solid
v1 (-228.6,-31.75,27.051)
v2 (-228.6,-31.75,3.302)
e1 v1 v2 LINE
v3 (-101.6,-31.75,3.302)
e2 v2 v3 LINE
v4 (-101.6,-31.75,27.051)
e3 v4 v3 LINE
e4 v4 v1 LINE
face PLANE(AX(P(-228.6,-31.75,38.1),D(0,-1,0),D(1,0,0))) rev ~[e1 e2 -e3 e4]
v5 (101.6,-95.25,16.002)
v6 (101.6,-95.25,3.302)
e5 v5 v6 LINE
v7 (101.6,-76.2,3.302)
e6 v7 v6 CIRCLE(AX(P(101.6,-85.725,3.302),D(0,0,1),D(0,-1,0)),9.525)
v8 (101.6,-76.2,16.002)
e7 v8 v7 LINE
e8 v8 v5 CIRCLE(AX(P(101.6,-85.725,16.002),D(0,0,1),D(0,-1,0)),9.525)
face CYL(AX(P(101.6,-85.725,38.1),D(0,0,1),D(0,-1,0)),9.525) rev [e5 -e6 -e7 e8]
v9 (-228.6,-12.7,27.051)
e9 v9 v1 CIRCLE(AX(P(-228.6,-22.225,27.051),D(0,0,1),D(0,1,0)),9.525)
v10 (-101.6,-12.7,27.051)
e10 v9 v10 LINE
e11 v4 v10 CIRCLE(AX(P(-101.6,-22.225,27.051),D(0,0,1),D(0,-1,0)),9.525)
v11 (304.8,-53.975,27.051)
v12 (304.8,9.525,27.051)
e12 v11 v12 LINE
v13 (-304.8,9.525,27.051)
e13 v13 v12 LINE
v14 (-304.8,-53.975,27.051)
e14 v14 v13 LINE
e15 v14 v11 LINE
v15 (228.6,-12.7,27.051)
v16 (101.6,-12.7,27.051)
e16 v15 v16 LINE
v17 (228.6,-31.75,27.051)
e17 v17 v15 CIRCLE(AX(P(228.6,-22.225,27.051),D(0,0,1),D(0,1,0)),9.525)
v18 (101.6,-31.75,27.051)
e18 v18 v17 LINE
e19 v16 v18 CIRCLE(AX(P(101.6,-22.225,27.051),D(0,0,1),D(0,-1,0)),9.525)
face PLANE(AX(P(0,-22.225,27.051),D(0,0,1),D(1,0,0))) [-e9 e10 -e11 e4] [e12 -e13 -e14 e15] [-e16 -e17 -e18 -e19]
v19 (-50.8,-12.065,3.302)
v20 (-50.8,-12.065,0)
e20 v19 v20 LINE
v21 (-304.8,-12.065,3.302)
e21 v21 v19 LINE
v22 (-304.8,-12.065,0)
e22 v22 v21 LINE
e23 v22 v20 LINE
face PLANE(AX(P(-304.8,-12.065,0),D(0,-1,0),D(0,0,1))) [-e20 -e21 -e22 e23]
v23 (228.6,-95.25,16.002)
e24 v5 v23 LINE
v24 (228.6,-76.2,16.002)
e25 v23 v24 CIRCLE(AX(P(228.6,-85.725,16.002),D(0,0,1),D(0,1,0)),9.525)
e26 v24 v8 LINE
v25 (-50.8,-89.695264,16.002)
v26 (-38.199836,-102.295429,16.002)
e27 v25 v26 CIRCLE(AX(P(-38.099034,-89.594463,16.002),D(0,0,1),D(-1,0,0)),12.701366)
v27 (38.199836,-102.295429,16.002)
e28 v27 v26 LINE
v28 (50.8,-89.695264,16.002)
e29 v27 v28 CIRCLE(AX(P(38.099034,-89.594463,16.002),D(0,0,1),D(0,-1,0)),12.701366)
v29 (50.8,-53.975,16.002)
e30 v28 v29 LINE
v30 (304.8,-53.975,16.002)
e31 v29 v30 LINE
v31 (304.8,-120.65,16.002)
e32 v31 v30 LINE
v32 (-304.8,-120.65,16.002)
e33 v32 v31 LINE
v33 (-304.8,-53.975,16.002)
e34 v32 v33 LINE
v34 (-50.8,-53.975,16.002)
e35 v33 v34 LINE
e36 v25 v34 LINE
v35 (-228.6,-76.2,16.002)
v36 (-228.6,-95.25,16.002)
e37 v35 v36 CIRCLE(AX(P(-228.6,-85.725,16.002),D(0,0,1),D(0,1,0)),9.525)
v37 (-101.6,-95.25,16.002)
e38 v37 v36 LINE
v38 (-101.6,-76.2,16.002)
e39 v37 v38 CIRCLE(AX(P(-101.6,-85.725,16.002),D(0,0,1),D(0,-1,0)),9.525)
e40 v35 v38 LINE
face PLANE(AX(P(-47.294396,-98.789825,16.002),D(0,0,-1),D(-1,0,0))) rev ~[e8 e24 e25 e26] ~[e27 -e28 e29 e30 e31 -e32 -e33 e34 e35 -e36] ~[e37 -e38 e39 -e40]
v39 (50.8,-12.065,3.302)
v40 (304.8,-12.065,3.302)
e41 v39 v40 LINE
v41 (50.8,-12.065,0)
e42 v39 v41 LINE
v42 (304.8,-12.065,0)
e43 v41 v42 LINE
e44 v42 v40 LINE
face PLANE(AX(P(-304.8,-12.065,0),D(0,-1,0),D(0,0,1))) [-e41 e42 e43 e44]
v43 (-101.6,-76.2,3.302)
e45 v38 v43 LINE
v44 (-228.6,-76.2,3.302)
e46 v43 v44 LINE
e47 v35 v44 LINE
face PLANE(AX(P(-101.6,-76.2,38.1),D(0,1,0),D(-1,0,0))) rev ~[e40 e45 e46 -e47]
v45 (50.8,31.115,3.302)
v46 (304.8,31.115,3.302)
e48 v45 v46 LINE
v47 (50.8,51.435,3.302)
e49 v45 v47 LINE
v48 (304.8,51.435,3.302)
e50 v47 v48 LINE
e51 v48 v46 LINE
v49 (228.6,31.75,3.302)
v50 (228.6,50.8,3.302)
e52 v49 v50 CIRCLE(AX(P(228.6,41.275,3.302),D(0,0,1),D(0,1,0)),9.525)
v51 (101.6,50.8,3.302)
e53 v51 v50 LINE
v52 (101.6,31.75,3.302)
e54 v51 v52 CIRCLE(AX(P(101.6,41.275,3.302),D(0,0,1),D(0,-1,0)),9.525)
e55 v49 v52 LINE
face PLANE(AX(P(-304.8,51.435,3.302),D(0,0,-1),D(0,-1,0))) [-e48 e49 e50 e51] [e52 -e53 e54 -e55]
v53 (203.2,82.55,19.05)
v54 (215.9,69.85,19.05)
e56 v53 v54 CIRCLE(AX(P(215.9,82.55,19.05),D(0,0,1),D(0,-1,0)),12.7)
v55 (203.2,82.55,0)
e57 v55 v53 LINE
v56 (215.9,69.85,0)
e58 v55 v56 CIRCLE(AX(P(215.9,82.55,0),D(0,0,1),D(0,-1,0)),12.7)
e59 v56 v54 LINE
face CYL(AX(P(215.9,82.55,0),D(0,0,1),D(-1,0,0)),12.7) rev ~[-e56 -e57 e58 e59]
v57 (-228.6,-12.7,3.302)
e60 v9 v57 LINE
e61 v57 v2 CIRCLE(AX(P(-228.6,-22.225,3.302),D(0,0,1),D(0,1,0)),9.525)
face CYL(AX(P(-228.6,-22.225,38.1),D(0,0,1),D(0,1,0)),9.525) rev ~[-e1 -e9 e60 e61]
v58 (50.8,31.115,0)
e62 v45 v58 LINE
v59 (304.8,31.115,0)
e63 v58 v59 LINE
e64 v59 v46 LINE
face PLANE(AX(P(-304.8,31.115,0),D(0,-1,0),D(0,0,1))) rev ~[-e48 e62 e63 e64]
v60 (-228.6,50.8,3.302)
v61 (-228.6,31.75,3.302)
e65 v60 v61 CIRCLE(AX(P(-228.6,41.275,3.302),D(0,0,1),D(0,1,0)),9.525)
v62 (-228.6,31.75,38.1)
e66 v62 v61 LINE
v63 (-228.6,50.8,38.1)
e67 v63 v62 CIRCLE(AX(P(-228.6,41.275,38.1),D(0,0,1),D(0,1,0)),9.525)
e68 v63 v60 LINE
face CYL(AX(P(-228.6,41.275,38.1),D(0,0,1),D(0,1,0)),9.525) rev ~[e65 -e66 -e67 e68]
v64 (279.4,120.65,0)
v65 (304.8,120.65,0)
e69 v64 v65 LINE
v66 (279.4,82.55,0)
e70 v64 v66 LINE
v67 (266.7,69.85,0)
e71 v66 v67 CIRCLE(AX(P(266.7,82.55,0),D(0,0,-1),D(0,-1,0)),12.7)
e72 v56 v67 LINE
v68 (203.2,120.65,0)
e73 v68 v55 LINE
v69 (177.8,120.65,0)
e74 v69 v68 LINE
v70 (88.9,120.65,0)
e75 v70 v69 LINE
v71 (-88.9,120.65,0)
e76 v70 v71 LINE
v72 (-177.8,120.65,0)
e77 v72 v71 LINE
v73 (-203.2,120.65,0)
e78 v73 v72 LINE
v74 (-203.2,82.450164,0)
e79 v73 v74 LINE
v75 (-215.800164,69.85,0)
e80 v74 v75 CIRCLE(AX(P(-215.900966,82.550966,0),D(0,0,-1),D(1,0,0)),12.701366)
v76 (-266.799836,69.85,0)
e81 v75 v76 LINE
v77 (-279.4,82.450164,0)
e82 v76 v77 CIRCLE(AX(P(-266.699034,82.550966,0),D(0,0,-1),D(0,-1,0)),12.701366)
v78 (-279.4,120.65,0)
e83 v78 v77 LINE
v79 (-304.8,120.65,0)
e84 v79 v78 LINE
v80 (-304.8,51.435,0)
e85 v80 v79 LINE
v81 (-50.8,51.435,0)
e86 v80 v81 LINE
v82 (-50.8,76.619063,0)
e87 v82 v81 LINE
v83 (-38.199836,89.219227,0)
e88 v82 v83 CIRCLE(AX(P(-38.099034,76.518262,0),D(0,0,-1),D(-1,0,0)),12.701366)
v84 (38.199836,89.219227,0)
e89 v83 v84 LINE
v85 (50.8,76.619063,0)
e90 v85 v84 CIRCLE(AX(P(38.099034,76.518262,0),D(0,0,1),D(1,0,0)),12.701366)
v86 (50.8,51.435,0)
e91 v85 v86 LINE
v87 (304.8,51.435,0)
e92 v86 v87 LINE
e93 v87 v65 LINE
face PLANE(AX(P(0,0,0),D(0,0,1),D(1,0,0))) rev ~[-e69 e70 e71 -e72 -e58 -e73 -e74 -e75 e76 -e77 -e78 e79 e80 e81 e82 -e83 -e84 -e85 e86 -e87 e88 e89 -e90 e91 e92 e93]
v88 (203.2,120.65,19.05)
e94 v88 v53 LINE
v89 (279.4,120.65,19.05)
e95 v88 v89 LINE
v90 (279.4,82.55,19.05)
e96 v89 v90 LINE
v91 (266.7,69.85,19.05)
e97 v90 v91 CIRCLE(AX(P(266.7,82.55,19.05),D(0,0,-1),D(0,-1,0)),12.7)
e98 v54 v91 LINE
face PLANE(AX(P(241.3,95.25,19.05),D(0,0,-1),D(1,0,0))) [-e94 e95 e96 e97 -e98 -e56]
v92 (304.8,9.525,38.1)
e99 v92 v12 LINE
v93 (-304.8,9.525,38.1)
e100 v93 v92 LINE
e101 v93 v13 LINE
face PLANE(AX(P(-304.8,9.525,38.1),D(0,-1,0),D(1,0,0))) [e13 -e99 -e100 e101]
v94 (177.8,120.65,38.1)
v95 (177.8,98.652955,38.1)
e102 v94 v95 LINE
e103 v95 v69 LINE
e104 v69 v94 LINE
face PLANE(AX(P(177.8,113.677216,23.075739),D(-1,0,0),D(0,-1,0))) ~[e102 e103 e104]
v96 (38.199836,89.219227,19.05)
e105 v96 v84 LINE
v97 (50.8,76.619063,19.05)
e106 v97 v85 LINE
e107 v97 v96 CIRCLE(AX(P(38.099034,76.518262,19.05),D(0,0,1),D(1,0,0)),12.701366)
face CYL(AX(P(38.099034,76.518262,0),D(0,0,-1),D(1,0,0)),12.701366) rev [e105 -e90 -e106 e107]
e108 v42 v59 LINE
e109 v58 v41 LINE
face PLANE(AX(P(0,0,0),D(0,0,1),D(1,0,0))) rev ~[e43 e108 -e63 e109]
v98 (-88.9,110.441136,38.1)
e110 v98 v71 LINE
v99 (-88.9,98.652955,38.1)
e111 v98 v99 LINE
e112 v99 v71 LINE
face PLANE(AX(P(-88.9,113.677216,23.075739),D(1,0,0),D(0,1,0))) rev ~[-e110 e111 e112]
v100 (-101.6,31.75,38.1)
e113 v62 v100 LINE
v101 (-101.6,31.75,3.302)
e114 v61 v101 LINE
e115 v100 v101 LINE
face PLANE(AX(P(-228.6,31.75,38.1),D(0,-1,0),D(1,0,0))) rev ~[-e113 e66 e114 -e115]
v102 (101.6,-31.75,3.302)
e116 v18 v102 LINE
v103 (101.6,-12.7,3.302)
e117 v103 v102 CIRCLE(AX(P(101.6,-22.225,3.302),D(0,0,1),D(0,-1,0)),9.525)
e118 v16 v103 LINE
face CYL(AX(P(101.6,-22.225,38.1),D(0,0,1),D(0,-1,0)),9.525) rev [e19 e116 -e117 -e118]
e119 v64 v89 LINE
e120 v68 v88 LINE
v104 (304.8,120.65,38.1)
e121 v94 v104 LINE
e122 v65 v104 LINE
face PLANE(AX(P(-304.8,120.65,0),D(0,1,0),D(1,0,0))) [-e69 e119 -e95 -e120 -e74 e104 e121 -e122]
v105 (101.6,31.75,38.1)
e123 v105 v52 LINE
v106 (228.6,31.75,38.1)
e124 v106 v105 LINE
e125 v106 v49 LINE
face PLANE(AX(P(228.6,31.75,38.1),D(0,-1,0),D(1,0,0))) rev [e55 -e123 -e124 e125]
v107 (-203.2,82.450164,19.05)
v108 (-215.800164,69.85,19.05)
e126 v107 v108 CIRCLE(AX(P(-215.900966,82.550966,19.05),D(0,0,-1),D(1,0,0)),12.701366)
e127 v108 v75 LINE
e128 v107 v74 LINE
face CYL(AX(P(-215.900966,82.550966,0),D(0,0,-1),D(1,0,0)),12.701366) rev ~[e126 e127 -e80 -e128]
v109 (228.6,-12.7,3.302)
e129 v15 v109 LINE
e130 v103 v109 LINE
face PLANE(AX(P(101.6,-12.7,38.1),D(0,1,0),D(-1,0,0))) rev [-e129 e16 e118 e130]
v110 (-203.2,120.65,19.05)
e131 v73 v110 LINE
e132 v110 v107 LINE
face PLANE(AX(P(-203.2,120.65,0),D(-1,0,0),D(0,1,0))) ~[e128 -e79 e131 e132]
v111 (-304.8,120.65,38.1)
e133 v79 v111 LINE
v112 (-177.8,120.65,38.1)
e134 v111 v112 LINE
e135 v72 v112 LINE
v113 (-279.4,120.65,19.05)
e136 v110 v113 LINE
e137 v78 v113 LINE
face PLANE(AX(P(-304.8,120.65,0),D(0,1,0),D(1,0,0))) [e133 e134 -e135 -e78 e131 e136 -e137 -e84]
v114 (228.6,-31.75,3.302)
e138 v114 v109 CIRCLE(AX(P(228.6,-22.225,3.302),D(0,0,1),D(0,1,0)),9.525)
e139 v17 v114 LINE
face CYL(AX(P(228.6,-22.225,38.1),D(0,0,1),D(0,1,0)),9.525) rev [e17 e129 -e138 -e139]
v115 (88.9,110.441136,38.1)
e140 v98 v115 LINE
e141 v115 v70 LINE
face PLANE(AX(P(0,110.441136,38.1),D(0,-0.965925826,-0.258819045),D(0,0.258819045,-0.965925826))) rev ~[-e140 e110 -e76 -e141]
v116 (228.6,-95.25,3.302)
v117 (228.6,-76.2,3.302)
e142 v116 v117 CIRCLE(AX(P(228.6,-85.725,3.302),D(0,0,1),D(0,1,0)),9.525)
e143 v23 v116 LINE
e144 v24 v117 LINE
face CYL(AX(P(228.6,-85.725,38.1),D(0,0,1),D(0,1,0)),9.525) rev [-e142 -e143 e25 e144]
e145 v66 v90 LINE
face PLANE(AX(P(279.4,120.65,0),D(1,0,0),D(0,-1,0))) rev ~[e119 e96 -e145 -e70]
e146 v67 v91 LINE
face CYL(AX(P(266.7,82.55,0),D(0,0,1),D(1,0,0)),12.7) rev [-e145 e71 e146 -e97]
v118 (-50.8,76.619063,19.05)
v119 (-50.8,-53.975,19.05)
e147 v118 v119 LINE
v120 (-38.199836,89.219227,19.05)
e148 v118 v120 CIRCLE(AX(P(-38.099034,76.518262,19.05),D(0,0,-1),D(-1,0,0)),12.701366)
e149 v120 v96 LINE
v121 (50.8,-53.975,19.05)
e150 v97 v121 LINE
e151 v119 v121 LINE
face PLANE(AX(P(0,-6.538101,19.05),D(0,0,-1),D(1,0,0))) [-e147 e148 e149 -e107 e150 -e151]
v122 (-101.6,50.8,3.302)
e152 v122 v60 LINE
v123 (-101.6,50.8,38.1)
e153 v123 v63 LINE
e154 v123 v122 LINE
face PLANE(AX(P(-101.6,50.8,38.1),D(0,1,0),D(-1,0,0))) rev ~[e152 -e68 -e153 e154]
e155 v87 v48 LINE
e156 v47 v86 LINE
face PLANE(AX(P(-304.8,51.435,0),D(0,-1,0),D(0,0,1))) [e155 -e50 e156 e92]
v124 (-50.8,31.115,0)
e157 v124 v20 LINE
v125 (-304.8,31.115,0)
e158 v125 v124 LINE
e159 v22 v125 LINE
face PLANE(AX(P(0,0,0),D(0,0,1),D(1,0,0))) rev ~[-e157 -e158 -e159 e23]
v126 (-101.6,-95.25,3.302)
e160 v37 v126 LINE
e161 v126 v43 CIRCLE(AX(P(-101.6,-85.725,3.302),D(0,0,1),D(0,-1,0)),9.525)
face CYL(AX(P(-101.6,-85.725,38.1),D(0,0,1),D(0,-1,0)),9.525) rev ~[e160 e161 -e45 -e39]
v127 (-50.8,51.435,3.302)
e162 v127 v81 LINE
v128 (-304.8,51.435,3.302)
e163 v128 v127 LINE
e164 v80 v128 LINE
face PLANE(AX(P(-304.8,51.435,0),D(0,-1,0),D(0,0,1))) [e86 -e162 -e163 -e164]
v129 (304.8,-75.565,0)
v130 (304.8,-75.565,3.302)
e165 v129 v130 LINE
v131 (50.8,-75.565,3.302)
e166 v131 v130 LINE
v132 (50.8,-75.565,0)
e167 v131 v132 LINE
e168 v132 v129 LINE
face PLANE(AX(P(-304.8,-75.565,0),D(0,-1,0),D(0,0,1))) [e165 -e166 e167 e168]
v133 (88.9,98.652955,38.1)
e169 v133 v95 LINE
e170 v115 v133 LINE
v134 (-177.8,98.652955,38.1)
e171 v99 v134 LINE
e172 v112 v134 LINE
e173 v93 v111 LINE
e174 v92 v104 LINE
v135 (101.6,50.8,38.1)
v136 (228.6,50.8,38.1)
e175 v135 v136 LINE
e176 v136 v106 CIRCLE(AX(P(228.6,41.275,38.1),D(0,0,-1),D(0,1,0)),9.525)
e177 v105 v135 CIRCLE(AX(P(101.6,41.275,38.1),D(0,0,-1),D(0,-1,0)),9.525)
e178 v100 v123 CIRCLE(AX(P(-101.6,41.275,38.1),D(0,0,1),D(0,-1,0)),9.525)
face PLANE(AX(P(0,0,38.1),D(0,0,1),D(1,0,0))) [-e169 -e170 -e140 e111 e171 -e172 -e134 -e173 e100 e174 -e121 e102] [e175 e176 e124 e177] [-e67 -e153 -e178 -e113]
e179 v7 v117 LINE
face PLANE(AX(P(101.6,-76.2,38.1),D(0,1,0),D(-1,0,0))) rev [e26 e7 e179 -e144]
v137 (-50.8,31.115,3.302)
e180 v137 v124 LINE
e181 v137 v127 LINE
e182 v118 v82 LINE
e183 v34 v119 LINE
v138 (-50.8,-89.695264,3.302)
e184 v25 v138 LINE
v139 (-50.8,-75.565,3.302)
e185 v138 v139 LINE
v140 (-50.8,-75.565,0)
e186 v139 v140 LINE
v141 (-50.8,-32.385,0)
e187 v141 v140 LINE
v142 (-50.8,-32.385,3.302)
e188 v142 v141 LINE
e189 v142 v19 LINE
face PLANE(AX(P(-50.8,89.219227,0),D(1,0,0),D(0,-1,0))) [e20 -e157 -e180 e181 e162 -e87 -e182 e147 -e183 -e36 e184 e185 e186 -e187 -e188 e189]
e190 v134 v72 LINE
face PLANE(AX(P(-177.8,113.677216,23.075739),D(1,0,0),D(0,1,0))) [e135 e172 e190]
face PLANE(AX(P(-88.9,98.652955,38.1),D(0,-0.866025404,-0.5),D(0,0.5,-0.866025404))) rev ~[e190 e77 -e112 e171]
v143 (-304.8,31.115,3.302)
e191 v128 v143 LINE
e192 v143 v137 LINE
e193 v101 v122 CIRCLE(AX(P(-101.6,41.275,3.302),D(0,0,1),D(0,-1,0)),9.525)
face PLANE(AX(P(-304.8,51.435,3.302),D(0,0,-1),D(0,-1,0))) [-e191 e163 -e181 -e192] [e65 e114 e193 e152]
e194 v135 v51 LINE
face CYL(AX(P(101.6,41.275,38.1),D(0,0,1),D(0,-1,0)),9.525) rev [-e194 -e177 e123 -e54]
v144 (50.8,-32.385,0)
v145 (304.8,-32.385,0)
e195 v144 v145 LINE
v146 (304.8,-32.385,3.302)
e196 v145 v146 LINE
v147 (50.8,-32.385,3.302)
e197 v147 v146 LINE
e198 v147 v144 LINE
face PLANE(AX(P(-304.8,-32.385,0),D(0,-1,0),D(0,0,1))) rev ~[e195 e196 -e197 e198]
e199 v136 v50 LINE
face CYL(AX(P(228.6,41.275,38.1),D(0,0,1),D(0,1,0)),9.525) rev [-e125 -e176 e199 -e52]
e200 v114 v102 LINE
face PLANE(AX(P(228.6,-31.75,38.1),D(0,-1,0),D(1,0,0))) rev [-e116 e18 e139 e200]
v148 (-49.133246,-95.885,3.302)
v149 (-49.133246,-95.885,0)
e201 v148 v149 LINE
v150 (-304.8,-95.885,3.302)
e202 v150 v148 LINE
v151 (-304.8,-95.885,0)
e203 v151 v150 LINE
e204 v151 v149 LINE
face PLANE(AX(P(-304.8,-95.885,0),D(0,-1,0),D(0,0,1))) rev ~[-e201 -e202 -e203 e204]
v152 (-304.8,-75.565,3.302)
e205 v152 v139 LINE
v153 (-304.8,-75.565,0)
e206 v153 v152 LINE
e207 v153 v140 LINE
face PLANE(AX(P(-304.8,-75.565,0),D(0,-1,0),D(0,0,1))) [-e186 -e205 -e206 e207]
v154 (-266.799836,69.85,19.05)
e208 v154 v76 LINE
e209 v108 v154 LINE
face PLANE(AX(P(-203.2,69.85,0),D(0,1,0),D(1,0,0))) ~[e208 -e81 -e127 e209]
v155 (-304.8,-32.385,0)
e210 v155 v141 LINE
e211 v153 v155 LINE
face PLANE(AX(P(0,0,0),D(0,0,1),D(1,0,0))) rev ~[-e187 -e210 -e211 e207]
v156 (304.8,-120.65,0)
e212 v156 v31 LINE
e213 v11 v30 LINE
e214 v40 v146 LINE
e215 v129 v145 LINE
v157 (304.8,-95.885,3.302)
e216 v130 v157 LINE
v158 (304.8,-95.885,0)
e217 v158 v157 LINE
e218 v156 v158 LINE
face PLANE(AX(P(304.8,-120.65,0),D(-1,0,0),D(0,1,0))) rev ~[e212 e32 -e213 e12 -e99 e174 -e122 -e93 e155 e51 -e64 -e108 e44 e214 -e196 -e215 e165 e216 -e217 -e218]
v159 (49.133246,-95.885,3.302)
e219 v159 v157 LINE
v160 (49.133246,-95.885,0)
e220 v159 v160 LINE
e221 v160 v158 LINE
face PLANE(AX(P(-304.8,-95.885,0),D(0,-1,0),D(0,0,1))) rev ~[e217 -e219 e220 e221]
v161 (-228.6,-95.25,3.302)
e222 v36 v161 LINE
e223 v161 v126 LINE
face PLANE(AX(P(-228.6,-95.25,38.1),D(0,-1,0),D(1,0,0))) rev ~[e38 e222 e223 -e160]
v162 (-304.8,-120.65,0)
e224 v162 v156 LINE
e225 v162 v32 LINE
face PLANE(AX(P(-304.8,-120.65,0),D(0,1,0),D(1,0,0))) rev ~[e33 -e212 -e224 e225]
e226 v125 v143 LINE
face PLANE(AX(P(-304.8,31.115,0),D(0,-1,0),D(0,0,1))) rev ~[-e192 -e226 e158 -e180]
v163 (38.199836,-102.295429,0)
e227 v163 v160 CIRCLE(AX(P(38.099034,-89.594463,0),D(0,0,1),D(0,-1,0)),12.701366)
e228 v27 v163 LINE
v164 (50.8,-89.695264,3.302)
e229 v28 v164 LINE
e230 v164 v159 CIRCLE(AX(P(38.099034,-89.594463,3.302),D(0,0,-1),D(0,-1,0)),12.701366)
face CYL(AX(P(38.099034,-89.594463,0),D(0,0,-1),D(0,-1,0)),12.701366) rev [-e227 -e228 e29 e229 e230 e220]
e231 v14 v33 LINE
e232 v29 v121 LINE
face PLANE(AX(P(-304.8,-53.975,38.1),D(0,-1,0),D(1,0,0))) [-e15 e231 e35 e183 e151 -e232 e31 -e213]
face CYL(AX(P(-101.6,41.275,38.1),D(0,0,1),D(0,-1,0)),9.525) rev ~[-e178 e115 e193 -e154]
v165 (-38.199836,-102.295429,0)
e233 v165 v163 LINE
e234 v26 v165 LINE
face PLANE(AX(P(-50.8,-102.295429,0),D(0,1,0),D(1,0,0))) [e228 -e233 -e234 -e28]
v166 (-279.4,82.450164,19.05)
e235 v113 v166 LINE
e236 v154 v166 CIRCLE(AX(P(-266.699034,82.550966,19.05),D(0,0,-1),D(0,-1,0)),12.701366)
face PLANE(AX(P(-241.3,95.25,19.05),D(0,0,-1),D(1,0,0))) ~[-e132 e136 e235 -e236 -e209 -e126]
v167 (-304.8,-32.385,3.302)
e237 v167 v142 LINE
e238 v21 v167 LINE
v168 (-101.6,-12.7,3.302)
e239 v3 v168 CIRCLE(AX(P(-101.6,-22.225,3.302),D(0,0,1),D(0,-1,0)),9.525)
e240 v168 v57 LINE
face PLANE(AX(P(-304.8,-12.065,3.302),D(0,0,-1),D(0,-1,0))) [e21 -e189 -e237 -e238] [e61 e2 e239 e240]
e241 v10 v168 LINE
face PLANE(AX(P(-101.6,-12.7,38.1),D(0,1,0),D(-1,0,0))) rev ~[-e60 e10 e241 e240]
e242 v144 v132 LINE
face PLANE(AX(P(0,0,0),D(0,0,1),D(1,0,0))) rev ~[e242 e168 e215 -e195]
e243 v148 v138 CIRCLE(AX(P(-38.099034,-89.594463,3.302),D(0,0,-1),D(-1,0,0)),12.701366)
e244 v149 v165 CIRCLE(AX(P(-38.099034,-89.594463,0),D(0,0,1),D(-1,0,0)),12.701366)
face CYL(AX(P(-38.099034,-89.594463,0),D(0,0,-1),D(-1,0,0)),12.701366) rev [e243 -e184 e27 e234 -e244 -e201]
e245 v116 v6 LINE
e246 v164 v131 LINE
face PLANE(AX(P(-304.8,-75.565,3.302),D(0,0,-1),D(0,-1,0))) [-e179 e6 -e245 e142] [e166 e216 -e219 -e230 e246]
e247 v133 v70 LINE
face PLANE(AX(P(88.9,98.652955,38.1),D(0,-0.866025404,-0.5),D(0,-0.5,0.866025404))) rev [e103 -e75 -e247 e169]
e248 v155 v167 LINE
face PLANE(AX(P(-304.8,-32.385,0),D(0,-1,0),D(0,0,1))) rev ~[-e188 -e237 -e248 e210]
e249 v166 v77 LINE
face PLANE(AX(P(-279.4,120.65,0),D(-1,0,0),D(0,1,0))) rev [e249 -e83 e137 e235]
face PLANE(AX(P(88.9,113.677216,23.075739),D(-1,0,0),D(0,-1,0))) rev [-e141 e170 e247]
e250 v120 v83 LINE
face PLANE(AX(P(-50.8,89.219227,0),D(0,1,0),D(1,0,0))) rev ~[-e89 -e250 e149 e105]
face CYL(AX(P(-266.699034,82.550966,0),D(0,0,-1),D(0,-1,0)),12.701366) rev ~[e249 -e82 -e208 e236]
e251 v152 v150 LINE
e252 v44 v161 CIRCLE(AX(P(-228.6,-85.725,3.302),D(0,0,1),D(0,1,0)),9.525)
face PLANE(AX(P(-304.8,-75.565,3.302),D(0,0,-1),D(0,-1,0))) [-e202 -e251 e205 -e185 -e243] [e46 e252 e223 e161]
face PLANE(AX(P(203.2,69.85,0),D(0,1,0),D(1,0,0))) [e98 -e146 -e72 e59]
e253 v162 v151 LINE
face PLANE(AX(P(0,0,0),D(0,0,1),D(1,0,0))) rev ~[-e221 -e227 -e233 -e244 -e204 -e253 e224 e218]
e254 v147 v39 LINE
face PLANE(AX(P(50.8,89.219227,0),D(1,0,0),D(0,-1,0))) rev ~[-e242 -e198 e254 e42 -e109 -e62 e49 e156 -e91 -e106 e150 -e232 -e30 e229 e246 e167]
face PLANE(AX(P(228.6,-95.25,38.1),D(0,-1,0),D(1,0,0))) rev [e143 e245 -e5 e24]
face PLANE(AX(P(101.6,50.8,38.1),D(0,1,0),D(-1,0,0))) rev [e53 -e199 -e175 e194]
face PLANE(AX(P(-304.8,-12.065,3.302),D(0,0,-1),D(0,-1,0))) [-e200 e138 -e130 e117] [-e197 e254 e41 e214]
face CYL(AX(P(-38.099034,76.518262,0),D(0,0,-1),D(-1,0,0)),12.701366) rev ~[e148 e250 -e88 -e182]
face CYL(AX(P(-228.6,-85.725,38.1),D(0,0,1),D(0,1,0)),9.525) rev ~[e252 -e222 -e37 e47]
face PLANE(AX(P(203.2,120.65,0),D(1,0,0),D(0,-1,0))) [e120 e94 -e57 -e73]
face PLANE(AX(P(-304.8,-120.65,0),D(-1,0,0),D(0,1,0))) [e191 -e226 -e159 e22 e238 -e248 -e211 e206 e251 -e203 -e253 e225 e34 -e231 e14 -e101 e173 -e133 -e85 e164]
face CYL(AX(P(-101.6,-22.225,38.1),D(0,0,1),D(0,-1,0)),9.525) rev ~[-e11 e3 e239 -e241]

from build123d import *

# Parameters (mm, degrees)
F0_W         = 609.6
F0_H         = 241.3
F1_DEPTH     = 38.1
F3_DEPTH     = 38.101
F4_W         = 76.2
F4_H         = 50.8
F5_DEPTH     = 19.05
F6_R         = 12.7
F8_DEPTH     = 88.9
F10_DEPTH    = 88.9
F11_W        = 609.6
F11_H        = 66.675
F12_DEPTH    = 22.098
F13_W        = 609.6
F13_H        = 63.5
F14_DEPTH    = 11.049
F15_W        = 101.6
F15_H        = 191.5146559477
F16_DEPTH    = 19.05
F17_T1_DEPTH = 19.05
F17_T3_DEPTH = 16.002
F18_W        = 20.32
F18_H        = 3.302
F19_DEPTH    = 609.601


# Not quite as in the source:
# - a fillet or chamfer that OpenCascade refuses, or shapes differently, is made with other operations: its cross-section is extruded or revolved along the edge and cut away or added
# - a pattern or mirror of a feature is missing from the dataset's text; its kind, count and spacing are read off the source's solid


with BuildPart() as f1:
    # F0 (on Top) → F1 (new body)
    with BuildSketch(Plane.XY):
        Rectangle(F0_W, F0_H)
    extrude(amount=F1_DEPTH)

    # F2 (on face) → F3 (cut, through all)
    with BuildSketch(Plane.XY.offset(38.1)):
        with BuildLine():
            Line((-101.6, -76.2), (-228.6, -76.2))
            ThreePointArc((-228.6, -76.2), (-238.125, -85.725), (-228.6, -95.25))
            Line((-228.6, -95.25), (-101.6, -95.25))
            ThreePointArc((-101.6, -95.25), (-92.075, -85.725), (-101.6, -76.2))
        make_face()
        with BuildLine():
            Line((-228.6, -31.75), (-101.6, -31.75))
            ThreePointArc((-101.6, -31.75), (-92.075, -22.225), (-101.6, -12.7))
            Line((-101.6, -12.7), (-228.6, -12.7))
            ThreePointArc((-228.6, -12.7), (-238.125, -22.225), (-228.6, -31.75))
        make_face()
        with BuildLine():
            Line((-228.6, 31.75), (-101.6, 31.75))
            ThreePointArc((-101.6, 31.75), (-92.075, 41.275), (-101.6, 50.8))
            Line((-101.6, 50.8), (-228.6, 50.8))
            ThreePointArc((-228.6, 50.8), (-238.125, 41.275), (-228.6, 31.75))
        make_face()
    f3 = extrude(amount=-F3_DEPTH, mode=Mode.SUBTRACT)

    # F3_copies: F3 across plane
    add(f3.mirror(Plane(origin=(0, 0, 0), x_dir=(0, 0, 1), z_dir=(1, 0, 0))), mode=Mode.SUBTRACT)

    # F4 (on face) → F5 (cut)
    with BuildSketch(Plane(origin=(0, 0, 0), x_dir=(1, 0, 0), z_dir=(0, 0, -1))):
        with Locations((241.3, -95.25)):
            Rectangle(F4_W, F4_H)
    f5 = extrude(amount=-F5_DEPTH, mode=Mode.SUBTRACT)

    # F5_copies: F5 across plane
    add(f5.mirror(Plane(origin=(0, 0, 0), x_dir=(0, 0, -1), z_dir=(-1, 0, 0))), mode=Mode.SUBTRACT)

    # F6
    f6_edges = [f1.edges().sort_by_distance(p)[0] for p in [
        (279.4, 69.85, 9.525),
        (203.2, 69.85, 9.525),
    ]]
    fillet(f6_edges, radius=F6_R)

    # F7 (on Right) → F8 (cut, symmetric)
    with BuildSketch(Plane.YZ):
        Polygon((120.65, 38.1), (110.4411357684, 38.1), (120.65, 0), align=None)
    extrude(amount=F8_DEPTH, both=True, mode=Mode.SUBTRACT)

    # F9 (on face) → F10 (cut)
    with BuildSketch(Plane.YZ.offset(-88.9)):
        Polygon((98.6529547439, 38.1), (120.65, 0), (120.65, 38.1), align=None)
    f10 = extrude(amount=-F10_DEPTH, mode=Mode.SUBTRACT)

    # F10_copies: F10 across plane
    add(f10.mirror(Plane(origin=(0, 0, 0), x_dir=(0, 0, 1), z_dir=(1, 0, 0))), mode=Mode.SUBTRACT)

    # F11 (on face) → F12 (cut)
    with BuildSketch(Plane.XY.offset(38.1)):
        with Locations((0, -87.3125)):
            Rectangle(F11_W, F11_H)
    extrude(amount=-F12_DEPTH, mode=Mode.SUBTRACT)

    # F13 (on face) → F14 (cut)
    with BuildSketch(Plane.XY.offset(38.1)):
        with Locations((0, -22.225)):
            Rectangle(F13_W, F13_H)
    extrude(amount=-F14_DEPTH, mode=Mode.SUBTRACT)

    # F15 (on face) → F16 (cut)
    with BuildSketch(Plane(origin=(0, 0, 0), x_dir=(1, 0, 0), z_dir=(0, 0, -1))):
        with Locations((0, 6.5381005406)):
            Rectangle(F15_W, F15_H)
    extrude(amount=-F16_DEPTH, mode=Mode.SUBTRACT)

    # F17: fillet of radius 12.7 on 6 edges, made by hand

    # F17_s2 → F17_t1 (join)
    with BuildSketch(Plane.XY):
        with BuildLine():
            ThreePointArc((-50.8004, 76.5182617478), (-47.0802561211, 85.4994835543), (-38.0990343146, 89.2196274332))
            Line((-38.0990343146, 89.2196274332), (-38.0990343146, 90.4897640017))
            ThreePointArc((-38.0990343146, 90.4897640017), (-44.4495171573, 90.4893640017), (-50.8, 90.4893640017))
            Line((-50.8, 90.4893640017), (-52.0701365685, 89.2192274332))
            ThreePointArc((-52.0701365685, 89.2192274332), (-52.0701365685, 82.8687445905), (-52.0705365685, 76.5182617478))
            Line((-52.0705365685, 76.5182617478), (-50.8004, 76.5182617478))
        make_face()
        with BuildLine():
            ThreePointArc((50.8004, 76.5182617478), (47.0802561211, 85.4994835543), (38.0990343146, 89.2196274332))
            Line((38.0990343146, 89.2196274332), (38.0990343146, 90.4897640017))
            ThreePointArc((38.0990343146, 90.4897640017), (44.4495171573, 90.4893640017), (50.8, 90.4893640017))
            Line((50.8, 90.4893640017), (52.0701365685, 89.2192274332))
            ThreePointArc((52.0701365685, 89.2192274332), (52.0701365685, 82.8687445905), (52.0705365685, 76.5182617478))
            Line((52.0705365685, 76.5182617478), (50.8004, 76.5182617478))
        make_face()
        with BuildLine():
            ThreePointArc((-203.1996, 82.5509656854), (-206.9197438789, 73.5697438789), (-215.9009656854, 69.8496))
            Line((-215.9009656854, 69.8496), (-215.9009656854, 68.5794634315))
            ThreePointArc((-215.9009656854, 68.5794634315), (-209.5504828427, 68.5798634315), (-203.2, 68.5798634315))
            Line((-203.2, 68.5798634315), (-201.9298634315, 69.85))
            ThreePointArc((-201.9298634315, 69.85), (-201.9298634315, 76.2004828427), (-201.9294634315, 82.5509656854))
            Line((-201.9294634315, 82.5509656854), (-203.1996, 82.5509656854))
        make_face()
        with BuildLine():
            ThreePointArc((-266.6990343146, 69.8496), (-275.6802561211, 73.5697438789), (-279.4004, 82.5509656854))
            Line((-279.4004, 82.5509656854), (-280.6705365685, 82.5509656854))
            ThreePointArc((-280.6705365685, 82.5509656854), (-280.6701365685, 76.2004828427), (-280.6701365685, 69.85))
            Line((-280.6701365685, 69.85), (-279.4, 68.5798634315))
            ThreePointArc((-279.4, 68.5798634315), (-273.0495171573, 68.5798634315), (-266.6990343146, 68.5794634315))
            Line((-266.6990343146, 68.5794634315), (-266.6990343146, 69.8496))
        make_face()
    extrude(amount=F17_T1_DEPTH)

    # F17_s4 → F17_t3 (join)
    with BuildSketch(Plane.XY):
        with BuildLine():
            ThreePointArc((-50.8004, -89.5944628291), (-47.0802561211, -98.5756846355), (-38.0990343146, -102.2958285145))
            Line((-38.0990343146, -102.2958285145), (-38.0990343146, -103.565965083))
            ThreePointArc((-38.0990343146, -103.565965083), (-44.4495171573, -103.565565083), (-50.8, -103.565565083))
            Line((-50.8, -103.565565083), (-52.0701365685, -102.2954285145))
            ThreePointArc((-52.0701365685, -102.2954285145), (-52.0701365685, -95.9449456718), (-52.0705365685, -89.5944628291))
            Line((-52.0705365685, -89.5944628291), (-50.8004, -89.5944628291))
        make_face()
        with BuildLine():
            ThreePointArc((38.0990343146, -102.2958285145), (47.0802561211, -98.5756846355), (50.8004, -89.5944628291))
            Line((50.8004, -89.5944628291), (52.0705365685, -89.5944628291))
            ThreePointArc((52.0705365685, -89.5944628291), (52.0701365685, -95.9449456718), (52.0701365685, -102.2954285145))
            Line((52.0701365685, -102.2954285145), (50.8, -103.565565083))
            ThreePointArc((50.8, -103.565565083), (44.4495171573, -103.565565083), (38.0990343146, -103.565965083))
            Line((38.0990343146, -103.565965083), (38.0990343146, -102.2958285145))
        make_face()
    extrude(amount=F17_T3_DEPTH)

    # F18 (on face) → F19 (cut, through all)
    with BuildSketch(Plane(origin=(-304.8, 0, 0), x_dir=(0, -1, 0), z_dir=(-1, 0, 0))):
        with Locations((-41.275, 1.651)):
            Rectangle(F18_W, F18_H)
        with Locations((22.225, 1.651)):
            Rectangle(F18_W, F18_H)
        with Locations((85.725, 1.651)):
            Rectangle(F18_W, F18_H)
    extrude(amount=-F19_DEPTH, mode=Mode.SUBTRACT)


solid = f1.part
